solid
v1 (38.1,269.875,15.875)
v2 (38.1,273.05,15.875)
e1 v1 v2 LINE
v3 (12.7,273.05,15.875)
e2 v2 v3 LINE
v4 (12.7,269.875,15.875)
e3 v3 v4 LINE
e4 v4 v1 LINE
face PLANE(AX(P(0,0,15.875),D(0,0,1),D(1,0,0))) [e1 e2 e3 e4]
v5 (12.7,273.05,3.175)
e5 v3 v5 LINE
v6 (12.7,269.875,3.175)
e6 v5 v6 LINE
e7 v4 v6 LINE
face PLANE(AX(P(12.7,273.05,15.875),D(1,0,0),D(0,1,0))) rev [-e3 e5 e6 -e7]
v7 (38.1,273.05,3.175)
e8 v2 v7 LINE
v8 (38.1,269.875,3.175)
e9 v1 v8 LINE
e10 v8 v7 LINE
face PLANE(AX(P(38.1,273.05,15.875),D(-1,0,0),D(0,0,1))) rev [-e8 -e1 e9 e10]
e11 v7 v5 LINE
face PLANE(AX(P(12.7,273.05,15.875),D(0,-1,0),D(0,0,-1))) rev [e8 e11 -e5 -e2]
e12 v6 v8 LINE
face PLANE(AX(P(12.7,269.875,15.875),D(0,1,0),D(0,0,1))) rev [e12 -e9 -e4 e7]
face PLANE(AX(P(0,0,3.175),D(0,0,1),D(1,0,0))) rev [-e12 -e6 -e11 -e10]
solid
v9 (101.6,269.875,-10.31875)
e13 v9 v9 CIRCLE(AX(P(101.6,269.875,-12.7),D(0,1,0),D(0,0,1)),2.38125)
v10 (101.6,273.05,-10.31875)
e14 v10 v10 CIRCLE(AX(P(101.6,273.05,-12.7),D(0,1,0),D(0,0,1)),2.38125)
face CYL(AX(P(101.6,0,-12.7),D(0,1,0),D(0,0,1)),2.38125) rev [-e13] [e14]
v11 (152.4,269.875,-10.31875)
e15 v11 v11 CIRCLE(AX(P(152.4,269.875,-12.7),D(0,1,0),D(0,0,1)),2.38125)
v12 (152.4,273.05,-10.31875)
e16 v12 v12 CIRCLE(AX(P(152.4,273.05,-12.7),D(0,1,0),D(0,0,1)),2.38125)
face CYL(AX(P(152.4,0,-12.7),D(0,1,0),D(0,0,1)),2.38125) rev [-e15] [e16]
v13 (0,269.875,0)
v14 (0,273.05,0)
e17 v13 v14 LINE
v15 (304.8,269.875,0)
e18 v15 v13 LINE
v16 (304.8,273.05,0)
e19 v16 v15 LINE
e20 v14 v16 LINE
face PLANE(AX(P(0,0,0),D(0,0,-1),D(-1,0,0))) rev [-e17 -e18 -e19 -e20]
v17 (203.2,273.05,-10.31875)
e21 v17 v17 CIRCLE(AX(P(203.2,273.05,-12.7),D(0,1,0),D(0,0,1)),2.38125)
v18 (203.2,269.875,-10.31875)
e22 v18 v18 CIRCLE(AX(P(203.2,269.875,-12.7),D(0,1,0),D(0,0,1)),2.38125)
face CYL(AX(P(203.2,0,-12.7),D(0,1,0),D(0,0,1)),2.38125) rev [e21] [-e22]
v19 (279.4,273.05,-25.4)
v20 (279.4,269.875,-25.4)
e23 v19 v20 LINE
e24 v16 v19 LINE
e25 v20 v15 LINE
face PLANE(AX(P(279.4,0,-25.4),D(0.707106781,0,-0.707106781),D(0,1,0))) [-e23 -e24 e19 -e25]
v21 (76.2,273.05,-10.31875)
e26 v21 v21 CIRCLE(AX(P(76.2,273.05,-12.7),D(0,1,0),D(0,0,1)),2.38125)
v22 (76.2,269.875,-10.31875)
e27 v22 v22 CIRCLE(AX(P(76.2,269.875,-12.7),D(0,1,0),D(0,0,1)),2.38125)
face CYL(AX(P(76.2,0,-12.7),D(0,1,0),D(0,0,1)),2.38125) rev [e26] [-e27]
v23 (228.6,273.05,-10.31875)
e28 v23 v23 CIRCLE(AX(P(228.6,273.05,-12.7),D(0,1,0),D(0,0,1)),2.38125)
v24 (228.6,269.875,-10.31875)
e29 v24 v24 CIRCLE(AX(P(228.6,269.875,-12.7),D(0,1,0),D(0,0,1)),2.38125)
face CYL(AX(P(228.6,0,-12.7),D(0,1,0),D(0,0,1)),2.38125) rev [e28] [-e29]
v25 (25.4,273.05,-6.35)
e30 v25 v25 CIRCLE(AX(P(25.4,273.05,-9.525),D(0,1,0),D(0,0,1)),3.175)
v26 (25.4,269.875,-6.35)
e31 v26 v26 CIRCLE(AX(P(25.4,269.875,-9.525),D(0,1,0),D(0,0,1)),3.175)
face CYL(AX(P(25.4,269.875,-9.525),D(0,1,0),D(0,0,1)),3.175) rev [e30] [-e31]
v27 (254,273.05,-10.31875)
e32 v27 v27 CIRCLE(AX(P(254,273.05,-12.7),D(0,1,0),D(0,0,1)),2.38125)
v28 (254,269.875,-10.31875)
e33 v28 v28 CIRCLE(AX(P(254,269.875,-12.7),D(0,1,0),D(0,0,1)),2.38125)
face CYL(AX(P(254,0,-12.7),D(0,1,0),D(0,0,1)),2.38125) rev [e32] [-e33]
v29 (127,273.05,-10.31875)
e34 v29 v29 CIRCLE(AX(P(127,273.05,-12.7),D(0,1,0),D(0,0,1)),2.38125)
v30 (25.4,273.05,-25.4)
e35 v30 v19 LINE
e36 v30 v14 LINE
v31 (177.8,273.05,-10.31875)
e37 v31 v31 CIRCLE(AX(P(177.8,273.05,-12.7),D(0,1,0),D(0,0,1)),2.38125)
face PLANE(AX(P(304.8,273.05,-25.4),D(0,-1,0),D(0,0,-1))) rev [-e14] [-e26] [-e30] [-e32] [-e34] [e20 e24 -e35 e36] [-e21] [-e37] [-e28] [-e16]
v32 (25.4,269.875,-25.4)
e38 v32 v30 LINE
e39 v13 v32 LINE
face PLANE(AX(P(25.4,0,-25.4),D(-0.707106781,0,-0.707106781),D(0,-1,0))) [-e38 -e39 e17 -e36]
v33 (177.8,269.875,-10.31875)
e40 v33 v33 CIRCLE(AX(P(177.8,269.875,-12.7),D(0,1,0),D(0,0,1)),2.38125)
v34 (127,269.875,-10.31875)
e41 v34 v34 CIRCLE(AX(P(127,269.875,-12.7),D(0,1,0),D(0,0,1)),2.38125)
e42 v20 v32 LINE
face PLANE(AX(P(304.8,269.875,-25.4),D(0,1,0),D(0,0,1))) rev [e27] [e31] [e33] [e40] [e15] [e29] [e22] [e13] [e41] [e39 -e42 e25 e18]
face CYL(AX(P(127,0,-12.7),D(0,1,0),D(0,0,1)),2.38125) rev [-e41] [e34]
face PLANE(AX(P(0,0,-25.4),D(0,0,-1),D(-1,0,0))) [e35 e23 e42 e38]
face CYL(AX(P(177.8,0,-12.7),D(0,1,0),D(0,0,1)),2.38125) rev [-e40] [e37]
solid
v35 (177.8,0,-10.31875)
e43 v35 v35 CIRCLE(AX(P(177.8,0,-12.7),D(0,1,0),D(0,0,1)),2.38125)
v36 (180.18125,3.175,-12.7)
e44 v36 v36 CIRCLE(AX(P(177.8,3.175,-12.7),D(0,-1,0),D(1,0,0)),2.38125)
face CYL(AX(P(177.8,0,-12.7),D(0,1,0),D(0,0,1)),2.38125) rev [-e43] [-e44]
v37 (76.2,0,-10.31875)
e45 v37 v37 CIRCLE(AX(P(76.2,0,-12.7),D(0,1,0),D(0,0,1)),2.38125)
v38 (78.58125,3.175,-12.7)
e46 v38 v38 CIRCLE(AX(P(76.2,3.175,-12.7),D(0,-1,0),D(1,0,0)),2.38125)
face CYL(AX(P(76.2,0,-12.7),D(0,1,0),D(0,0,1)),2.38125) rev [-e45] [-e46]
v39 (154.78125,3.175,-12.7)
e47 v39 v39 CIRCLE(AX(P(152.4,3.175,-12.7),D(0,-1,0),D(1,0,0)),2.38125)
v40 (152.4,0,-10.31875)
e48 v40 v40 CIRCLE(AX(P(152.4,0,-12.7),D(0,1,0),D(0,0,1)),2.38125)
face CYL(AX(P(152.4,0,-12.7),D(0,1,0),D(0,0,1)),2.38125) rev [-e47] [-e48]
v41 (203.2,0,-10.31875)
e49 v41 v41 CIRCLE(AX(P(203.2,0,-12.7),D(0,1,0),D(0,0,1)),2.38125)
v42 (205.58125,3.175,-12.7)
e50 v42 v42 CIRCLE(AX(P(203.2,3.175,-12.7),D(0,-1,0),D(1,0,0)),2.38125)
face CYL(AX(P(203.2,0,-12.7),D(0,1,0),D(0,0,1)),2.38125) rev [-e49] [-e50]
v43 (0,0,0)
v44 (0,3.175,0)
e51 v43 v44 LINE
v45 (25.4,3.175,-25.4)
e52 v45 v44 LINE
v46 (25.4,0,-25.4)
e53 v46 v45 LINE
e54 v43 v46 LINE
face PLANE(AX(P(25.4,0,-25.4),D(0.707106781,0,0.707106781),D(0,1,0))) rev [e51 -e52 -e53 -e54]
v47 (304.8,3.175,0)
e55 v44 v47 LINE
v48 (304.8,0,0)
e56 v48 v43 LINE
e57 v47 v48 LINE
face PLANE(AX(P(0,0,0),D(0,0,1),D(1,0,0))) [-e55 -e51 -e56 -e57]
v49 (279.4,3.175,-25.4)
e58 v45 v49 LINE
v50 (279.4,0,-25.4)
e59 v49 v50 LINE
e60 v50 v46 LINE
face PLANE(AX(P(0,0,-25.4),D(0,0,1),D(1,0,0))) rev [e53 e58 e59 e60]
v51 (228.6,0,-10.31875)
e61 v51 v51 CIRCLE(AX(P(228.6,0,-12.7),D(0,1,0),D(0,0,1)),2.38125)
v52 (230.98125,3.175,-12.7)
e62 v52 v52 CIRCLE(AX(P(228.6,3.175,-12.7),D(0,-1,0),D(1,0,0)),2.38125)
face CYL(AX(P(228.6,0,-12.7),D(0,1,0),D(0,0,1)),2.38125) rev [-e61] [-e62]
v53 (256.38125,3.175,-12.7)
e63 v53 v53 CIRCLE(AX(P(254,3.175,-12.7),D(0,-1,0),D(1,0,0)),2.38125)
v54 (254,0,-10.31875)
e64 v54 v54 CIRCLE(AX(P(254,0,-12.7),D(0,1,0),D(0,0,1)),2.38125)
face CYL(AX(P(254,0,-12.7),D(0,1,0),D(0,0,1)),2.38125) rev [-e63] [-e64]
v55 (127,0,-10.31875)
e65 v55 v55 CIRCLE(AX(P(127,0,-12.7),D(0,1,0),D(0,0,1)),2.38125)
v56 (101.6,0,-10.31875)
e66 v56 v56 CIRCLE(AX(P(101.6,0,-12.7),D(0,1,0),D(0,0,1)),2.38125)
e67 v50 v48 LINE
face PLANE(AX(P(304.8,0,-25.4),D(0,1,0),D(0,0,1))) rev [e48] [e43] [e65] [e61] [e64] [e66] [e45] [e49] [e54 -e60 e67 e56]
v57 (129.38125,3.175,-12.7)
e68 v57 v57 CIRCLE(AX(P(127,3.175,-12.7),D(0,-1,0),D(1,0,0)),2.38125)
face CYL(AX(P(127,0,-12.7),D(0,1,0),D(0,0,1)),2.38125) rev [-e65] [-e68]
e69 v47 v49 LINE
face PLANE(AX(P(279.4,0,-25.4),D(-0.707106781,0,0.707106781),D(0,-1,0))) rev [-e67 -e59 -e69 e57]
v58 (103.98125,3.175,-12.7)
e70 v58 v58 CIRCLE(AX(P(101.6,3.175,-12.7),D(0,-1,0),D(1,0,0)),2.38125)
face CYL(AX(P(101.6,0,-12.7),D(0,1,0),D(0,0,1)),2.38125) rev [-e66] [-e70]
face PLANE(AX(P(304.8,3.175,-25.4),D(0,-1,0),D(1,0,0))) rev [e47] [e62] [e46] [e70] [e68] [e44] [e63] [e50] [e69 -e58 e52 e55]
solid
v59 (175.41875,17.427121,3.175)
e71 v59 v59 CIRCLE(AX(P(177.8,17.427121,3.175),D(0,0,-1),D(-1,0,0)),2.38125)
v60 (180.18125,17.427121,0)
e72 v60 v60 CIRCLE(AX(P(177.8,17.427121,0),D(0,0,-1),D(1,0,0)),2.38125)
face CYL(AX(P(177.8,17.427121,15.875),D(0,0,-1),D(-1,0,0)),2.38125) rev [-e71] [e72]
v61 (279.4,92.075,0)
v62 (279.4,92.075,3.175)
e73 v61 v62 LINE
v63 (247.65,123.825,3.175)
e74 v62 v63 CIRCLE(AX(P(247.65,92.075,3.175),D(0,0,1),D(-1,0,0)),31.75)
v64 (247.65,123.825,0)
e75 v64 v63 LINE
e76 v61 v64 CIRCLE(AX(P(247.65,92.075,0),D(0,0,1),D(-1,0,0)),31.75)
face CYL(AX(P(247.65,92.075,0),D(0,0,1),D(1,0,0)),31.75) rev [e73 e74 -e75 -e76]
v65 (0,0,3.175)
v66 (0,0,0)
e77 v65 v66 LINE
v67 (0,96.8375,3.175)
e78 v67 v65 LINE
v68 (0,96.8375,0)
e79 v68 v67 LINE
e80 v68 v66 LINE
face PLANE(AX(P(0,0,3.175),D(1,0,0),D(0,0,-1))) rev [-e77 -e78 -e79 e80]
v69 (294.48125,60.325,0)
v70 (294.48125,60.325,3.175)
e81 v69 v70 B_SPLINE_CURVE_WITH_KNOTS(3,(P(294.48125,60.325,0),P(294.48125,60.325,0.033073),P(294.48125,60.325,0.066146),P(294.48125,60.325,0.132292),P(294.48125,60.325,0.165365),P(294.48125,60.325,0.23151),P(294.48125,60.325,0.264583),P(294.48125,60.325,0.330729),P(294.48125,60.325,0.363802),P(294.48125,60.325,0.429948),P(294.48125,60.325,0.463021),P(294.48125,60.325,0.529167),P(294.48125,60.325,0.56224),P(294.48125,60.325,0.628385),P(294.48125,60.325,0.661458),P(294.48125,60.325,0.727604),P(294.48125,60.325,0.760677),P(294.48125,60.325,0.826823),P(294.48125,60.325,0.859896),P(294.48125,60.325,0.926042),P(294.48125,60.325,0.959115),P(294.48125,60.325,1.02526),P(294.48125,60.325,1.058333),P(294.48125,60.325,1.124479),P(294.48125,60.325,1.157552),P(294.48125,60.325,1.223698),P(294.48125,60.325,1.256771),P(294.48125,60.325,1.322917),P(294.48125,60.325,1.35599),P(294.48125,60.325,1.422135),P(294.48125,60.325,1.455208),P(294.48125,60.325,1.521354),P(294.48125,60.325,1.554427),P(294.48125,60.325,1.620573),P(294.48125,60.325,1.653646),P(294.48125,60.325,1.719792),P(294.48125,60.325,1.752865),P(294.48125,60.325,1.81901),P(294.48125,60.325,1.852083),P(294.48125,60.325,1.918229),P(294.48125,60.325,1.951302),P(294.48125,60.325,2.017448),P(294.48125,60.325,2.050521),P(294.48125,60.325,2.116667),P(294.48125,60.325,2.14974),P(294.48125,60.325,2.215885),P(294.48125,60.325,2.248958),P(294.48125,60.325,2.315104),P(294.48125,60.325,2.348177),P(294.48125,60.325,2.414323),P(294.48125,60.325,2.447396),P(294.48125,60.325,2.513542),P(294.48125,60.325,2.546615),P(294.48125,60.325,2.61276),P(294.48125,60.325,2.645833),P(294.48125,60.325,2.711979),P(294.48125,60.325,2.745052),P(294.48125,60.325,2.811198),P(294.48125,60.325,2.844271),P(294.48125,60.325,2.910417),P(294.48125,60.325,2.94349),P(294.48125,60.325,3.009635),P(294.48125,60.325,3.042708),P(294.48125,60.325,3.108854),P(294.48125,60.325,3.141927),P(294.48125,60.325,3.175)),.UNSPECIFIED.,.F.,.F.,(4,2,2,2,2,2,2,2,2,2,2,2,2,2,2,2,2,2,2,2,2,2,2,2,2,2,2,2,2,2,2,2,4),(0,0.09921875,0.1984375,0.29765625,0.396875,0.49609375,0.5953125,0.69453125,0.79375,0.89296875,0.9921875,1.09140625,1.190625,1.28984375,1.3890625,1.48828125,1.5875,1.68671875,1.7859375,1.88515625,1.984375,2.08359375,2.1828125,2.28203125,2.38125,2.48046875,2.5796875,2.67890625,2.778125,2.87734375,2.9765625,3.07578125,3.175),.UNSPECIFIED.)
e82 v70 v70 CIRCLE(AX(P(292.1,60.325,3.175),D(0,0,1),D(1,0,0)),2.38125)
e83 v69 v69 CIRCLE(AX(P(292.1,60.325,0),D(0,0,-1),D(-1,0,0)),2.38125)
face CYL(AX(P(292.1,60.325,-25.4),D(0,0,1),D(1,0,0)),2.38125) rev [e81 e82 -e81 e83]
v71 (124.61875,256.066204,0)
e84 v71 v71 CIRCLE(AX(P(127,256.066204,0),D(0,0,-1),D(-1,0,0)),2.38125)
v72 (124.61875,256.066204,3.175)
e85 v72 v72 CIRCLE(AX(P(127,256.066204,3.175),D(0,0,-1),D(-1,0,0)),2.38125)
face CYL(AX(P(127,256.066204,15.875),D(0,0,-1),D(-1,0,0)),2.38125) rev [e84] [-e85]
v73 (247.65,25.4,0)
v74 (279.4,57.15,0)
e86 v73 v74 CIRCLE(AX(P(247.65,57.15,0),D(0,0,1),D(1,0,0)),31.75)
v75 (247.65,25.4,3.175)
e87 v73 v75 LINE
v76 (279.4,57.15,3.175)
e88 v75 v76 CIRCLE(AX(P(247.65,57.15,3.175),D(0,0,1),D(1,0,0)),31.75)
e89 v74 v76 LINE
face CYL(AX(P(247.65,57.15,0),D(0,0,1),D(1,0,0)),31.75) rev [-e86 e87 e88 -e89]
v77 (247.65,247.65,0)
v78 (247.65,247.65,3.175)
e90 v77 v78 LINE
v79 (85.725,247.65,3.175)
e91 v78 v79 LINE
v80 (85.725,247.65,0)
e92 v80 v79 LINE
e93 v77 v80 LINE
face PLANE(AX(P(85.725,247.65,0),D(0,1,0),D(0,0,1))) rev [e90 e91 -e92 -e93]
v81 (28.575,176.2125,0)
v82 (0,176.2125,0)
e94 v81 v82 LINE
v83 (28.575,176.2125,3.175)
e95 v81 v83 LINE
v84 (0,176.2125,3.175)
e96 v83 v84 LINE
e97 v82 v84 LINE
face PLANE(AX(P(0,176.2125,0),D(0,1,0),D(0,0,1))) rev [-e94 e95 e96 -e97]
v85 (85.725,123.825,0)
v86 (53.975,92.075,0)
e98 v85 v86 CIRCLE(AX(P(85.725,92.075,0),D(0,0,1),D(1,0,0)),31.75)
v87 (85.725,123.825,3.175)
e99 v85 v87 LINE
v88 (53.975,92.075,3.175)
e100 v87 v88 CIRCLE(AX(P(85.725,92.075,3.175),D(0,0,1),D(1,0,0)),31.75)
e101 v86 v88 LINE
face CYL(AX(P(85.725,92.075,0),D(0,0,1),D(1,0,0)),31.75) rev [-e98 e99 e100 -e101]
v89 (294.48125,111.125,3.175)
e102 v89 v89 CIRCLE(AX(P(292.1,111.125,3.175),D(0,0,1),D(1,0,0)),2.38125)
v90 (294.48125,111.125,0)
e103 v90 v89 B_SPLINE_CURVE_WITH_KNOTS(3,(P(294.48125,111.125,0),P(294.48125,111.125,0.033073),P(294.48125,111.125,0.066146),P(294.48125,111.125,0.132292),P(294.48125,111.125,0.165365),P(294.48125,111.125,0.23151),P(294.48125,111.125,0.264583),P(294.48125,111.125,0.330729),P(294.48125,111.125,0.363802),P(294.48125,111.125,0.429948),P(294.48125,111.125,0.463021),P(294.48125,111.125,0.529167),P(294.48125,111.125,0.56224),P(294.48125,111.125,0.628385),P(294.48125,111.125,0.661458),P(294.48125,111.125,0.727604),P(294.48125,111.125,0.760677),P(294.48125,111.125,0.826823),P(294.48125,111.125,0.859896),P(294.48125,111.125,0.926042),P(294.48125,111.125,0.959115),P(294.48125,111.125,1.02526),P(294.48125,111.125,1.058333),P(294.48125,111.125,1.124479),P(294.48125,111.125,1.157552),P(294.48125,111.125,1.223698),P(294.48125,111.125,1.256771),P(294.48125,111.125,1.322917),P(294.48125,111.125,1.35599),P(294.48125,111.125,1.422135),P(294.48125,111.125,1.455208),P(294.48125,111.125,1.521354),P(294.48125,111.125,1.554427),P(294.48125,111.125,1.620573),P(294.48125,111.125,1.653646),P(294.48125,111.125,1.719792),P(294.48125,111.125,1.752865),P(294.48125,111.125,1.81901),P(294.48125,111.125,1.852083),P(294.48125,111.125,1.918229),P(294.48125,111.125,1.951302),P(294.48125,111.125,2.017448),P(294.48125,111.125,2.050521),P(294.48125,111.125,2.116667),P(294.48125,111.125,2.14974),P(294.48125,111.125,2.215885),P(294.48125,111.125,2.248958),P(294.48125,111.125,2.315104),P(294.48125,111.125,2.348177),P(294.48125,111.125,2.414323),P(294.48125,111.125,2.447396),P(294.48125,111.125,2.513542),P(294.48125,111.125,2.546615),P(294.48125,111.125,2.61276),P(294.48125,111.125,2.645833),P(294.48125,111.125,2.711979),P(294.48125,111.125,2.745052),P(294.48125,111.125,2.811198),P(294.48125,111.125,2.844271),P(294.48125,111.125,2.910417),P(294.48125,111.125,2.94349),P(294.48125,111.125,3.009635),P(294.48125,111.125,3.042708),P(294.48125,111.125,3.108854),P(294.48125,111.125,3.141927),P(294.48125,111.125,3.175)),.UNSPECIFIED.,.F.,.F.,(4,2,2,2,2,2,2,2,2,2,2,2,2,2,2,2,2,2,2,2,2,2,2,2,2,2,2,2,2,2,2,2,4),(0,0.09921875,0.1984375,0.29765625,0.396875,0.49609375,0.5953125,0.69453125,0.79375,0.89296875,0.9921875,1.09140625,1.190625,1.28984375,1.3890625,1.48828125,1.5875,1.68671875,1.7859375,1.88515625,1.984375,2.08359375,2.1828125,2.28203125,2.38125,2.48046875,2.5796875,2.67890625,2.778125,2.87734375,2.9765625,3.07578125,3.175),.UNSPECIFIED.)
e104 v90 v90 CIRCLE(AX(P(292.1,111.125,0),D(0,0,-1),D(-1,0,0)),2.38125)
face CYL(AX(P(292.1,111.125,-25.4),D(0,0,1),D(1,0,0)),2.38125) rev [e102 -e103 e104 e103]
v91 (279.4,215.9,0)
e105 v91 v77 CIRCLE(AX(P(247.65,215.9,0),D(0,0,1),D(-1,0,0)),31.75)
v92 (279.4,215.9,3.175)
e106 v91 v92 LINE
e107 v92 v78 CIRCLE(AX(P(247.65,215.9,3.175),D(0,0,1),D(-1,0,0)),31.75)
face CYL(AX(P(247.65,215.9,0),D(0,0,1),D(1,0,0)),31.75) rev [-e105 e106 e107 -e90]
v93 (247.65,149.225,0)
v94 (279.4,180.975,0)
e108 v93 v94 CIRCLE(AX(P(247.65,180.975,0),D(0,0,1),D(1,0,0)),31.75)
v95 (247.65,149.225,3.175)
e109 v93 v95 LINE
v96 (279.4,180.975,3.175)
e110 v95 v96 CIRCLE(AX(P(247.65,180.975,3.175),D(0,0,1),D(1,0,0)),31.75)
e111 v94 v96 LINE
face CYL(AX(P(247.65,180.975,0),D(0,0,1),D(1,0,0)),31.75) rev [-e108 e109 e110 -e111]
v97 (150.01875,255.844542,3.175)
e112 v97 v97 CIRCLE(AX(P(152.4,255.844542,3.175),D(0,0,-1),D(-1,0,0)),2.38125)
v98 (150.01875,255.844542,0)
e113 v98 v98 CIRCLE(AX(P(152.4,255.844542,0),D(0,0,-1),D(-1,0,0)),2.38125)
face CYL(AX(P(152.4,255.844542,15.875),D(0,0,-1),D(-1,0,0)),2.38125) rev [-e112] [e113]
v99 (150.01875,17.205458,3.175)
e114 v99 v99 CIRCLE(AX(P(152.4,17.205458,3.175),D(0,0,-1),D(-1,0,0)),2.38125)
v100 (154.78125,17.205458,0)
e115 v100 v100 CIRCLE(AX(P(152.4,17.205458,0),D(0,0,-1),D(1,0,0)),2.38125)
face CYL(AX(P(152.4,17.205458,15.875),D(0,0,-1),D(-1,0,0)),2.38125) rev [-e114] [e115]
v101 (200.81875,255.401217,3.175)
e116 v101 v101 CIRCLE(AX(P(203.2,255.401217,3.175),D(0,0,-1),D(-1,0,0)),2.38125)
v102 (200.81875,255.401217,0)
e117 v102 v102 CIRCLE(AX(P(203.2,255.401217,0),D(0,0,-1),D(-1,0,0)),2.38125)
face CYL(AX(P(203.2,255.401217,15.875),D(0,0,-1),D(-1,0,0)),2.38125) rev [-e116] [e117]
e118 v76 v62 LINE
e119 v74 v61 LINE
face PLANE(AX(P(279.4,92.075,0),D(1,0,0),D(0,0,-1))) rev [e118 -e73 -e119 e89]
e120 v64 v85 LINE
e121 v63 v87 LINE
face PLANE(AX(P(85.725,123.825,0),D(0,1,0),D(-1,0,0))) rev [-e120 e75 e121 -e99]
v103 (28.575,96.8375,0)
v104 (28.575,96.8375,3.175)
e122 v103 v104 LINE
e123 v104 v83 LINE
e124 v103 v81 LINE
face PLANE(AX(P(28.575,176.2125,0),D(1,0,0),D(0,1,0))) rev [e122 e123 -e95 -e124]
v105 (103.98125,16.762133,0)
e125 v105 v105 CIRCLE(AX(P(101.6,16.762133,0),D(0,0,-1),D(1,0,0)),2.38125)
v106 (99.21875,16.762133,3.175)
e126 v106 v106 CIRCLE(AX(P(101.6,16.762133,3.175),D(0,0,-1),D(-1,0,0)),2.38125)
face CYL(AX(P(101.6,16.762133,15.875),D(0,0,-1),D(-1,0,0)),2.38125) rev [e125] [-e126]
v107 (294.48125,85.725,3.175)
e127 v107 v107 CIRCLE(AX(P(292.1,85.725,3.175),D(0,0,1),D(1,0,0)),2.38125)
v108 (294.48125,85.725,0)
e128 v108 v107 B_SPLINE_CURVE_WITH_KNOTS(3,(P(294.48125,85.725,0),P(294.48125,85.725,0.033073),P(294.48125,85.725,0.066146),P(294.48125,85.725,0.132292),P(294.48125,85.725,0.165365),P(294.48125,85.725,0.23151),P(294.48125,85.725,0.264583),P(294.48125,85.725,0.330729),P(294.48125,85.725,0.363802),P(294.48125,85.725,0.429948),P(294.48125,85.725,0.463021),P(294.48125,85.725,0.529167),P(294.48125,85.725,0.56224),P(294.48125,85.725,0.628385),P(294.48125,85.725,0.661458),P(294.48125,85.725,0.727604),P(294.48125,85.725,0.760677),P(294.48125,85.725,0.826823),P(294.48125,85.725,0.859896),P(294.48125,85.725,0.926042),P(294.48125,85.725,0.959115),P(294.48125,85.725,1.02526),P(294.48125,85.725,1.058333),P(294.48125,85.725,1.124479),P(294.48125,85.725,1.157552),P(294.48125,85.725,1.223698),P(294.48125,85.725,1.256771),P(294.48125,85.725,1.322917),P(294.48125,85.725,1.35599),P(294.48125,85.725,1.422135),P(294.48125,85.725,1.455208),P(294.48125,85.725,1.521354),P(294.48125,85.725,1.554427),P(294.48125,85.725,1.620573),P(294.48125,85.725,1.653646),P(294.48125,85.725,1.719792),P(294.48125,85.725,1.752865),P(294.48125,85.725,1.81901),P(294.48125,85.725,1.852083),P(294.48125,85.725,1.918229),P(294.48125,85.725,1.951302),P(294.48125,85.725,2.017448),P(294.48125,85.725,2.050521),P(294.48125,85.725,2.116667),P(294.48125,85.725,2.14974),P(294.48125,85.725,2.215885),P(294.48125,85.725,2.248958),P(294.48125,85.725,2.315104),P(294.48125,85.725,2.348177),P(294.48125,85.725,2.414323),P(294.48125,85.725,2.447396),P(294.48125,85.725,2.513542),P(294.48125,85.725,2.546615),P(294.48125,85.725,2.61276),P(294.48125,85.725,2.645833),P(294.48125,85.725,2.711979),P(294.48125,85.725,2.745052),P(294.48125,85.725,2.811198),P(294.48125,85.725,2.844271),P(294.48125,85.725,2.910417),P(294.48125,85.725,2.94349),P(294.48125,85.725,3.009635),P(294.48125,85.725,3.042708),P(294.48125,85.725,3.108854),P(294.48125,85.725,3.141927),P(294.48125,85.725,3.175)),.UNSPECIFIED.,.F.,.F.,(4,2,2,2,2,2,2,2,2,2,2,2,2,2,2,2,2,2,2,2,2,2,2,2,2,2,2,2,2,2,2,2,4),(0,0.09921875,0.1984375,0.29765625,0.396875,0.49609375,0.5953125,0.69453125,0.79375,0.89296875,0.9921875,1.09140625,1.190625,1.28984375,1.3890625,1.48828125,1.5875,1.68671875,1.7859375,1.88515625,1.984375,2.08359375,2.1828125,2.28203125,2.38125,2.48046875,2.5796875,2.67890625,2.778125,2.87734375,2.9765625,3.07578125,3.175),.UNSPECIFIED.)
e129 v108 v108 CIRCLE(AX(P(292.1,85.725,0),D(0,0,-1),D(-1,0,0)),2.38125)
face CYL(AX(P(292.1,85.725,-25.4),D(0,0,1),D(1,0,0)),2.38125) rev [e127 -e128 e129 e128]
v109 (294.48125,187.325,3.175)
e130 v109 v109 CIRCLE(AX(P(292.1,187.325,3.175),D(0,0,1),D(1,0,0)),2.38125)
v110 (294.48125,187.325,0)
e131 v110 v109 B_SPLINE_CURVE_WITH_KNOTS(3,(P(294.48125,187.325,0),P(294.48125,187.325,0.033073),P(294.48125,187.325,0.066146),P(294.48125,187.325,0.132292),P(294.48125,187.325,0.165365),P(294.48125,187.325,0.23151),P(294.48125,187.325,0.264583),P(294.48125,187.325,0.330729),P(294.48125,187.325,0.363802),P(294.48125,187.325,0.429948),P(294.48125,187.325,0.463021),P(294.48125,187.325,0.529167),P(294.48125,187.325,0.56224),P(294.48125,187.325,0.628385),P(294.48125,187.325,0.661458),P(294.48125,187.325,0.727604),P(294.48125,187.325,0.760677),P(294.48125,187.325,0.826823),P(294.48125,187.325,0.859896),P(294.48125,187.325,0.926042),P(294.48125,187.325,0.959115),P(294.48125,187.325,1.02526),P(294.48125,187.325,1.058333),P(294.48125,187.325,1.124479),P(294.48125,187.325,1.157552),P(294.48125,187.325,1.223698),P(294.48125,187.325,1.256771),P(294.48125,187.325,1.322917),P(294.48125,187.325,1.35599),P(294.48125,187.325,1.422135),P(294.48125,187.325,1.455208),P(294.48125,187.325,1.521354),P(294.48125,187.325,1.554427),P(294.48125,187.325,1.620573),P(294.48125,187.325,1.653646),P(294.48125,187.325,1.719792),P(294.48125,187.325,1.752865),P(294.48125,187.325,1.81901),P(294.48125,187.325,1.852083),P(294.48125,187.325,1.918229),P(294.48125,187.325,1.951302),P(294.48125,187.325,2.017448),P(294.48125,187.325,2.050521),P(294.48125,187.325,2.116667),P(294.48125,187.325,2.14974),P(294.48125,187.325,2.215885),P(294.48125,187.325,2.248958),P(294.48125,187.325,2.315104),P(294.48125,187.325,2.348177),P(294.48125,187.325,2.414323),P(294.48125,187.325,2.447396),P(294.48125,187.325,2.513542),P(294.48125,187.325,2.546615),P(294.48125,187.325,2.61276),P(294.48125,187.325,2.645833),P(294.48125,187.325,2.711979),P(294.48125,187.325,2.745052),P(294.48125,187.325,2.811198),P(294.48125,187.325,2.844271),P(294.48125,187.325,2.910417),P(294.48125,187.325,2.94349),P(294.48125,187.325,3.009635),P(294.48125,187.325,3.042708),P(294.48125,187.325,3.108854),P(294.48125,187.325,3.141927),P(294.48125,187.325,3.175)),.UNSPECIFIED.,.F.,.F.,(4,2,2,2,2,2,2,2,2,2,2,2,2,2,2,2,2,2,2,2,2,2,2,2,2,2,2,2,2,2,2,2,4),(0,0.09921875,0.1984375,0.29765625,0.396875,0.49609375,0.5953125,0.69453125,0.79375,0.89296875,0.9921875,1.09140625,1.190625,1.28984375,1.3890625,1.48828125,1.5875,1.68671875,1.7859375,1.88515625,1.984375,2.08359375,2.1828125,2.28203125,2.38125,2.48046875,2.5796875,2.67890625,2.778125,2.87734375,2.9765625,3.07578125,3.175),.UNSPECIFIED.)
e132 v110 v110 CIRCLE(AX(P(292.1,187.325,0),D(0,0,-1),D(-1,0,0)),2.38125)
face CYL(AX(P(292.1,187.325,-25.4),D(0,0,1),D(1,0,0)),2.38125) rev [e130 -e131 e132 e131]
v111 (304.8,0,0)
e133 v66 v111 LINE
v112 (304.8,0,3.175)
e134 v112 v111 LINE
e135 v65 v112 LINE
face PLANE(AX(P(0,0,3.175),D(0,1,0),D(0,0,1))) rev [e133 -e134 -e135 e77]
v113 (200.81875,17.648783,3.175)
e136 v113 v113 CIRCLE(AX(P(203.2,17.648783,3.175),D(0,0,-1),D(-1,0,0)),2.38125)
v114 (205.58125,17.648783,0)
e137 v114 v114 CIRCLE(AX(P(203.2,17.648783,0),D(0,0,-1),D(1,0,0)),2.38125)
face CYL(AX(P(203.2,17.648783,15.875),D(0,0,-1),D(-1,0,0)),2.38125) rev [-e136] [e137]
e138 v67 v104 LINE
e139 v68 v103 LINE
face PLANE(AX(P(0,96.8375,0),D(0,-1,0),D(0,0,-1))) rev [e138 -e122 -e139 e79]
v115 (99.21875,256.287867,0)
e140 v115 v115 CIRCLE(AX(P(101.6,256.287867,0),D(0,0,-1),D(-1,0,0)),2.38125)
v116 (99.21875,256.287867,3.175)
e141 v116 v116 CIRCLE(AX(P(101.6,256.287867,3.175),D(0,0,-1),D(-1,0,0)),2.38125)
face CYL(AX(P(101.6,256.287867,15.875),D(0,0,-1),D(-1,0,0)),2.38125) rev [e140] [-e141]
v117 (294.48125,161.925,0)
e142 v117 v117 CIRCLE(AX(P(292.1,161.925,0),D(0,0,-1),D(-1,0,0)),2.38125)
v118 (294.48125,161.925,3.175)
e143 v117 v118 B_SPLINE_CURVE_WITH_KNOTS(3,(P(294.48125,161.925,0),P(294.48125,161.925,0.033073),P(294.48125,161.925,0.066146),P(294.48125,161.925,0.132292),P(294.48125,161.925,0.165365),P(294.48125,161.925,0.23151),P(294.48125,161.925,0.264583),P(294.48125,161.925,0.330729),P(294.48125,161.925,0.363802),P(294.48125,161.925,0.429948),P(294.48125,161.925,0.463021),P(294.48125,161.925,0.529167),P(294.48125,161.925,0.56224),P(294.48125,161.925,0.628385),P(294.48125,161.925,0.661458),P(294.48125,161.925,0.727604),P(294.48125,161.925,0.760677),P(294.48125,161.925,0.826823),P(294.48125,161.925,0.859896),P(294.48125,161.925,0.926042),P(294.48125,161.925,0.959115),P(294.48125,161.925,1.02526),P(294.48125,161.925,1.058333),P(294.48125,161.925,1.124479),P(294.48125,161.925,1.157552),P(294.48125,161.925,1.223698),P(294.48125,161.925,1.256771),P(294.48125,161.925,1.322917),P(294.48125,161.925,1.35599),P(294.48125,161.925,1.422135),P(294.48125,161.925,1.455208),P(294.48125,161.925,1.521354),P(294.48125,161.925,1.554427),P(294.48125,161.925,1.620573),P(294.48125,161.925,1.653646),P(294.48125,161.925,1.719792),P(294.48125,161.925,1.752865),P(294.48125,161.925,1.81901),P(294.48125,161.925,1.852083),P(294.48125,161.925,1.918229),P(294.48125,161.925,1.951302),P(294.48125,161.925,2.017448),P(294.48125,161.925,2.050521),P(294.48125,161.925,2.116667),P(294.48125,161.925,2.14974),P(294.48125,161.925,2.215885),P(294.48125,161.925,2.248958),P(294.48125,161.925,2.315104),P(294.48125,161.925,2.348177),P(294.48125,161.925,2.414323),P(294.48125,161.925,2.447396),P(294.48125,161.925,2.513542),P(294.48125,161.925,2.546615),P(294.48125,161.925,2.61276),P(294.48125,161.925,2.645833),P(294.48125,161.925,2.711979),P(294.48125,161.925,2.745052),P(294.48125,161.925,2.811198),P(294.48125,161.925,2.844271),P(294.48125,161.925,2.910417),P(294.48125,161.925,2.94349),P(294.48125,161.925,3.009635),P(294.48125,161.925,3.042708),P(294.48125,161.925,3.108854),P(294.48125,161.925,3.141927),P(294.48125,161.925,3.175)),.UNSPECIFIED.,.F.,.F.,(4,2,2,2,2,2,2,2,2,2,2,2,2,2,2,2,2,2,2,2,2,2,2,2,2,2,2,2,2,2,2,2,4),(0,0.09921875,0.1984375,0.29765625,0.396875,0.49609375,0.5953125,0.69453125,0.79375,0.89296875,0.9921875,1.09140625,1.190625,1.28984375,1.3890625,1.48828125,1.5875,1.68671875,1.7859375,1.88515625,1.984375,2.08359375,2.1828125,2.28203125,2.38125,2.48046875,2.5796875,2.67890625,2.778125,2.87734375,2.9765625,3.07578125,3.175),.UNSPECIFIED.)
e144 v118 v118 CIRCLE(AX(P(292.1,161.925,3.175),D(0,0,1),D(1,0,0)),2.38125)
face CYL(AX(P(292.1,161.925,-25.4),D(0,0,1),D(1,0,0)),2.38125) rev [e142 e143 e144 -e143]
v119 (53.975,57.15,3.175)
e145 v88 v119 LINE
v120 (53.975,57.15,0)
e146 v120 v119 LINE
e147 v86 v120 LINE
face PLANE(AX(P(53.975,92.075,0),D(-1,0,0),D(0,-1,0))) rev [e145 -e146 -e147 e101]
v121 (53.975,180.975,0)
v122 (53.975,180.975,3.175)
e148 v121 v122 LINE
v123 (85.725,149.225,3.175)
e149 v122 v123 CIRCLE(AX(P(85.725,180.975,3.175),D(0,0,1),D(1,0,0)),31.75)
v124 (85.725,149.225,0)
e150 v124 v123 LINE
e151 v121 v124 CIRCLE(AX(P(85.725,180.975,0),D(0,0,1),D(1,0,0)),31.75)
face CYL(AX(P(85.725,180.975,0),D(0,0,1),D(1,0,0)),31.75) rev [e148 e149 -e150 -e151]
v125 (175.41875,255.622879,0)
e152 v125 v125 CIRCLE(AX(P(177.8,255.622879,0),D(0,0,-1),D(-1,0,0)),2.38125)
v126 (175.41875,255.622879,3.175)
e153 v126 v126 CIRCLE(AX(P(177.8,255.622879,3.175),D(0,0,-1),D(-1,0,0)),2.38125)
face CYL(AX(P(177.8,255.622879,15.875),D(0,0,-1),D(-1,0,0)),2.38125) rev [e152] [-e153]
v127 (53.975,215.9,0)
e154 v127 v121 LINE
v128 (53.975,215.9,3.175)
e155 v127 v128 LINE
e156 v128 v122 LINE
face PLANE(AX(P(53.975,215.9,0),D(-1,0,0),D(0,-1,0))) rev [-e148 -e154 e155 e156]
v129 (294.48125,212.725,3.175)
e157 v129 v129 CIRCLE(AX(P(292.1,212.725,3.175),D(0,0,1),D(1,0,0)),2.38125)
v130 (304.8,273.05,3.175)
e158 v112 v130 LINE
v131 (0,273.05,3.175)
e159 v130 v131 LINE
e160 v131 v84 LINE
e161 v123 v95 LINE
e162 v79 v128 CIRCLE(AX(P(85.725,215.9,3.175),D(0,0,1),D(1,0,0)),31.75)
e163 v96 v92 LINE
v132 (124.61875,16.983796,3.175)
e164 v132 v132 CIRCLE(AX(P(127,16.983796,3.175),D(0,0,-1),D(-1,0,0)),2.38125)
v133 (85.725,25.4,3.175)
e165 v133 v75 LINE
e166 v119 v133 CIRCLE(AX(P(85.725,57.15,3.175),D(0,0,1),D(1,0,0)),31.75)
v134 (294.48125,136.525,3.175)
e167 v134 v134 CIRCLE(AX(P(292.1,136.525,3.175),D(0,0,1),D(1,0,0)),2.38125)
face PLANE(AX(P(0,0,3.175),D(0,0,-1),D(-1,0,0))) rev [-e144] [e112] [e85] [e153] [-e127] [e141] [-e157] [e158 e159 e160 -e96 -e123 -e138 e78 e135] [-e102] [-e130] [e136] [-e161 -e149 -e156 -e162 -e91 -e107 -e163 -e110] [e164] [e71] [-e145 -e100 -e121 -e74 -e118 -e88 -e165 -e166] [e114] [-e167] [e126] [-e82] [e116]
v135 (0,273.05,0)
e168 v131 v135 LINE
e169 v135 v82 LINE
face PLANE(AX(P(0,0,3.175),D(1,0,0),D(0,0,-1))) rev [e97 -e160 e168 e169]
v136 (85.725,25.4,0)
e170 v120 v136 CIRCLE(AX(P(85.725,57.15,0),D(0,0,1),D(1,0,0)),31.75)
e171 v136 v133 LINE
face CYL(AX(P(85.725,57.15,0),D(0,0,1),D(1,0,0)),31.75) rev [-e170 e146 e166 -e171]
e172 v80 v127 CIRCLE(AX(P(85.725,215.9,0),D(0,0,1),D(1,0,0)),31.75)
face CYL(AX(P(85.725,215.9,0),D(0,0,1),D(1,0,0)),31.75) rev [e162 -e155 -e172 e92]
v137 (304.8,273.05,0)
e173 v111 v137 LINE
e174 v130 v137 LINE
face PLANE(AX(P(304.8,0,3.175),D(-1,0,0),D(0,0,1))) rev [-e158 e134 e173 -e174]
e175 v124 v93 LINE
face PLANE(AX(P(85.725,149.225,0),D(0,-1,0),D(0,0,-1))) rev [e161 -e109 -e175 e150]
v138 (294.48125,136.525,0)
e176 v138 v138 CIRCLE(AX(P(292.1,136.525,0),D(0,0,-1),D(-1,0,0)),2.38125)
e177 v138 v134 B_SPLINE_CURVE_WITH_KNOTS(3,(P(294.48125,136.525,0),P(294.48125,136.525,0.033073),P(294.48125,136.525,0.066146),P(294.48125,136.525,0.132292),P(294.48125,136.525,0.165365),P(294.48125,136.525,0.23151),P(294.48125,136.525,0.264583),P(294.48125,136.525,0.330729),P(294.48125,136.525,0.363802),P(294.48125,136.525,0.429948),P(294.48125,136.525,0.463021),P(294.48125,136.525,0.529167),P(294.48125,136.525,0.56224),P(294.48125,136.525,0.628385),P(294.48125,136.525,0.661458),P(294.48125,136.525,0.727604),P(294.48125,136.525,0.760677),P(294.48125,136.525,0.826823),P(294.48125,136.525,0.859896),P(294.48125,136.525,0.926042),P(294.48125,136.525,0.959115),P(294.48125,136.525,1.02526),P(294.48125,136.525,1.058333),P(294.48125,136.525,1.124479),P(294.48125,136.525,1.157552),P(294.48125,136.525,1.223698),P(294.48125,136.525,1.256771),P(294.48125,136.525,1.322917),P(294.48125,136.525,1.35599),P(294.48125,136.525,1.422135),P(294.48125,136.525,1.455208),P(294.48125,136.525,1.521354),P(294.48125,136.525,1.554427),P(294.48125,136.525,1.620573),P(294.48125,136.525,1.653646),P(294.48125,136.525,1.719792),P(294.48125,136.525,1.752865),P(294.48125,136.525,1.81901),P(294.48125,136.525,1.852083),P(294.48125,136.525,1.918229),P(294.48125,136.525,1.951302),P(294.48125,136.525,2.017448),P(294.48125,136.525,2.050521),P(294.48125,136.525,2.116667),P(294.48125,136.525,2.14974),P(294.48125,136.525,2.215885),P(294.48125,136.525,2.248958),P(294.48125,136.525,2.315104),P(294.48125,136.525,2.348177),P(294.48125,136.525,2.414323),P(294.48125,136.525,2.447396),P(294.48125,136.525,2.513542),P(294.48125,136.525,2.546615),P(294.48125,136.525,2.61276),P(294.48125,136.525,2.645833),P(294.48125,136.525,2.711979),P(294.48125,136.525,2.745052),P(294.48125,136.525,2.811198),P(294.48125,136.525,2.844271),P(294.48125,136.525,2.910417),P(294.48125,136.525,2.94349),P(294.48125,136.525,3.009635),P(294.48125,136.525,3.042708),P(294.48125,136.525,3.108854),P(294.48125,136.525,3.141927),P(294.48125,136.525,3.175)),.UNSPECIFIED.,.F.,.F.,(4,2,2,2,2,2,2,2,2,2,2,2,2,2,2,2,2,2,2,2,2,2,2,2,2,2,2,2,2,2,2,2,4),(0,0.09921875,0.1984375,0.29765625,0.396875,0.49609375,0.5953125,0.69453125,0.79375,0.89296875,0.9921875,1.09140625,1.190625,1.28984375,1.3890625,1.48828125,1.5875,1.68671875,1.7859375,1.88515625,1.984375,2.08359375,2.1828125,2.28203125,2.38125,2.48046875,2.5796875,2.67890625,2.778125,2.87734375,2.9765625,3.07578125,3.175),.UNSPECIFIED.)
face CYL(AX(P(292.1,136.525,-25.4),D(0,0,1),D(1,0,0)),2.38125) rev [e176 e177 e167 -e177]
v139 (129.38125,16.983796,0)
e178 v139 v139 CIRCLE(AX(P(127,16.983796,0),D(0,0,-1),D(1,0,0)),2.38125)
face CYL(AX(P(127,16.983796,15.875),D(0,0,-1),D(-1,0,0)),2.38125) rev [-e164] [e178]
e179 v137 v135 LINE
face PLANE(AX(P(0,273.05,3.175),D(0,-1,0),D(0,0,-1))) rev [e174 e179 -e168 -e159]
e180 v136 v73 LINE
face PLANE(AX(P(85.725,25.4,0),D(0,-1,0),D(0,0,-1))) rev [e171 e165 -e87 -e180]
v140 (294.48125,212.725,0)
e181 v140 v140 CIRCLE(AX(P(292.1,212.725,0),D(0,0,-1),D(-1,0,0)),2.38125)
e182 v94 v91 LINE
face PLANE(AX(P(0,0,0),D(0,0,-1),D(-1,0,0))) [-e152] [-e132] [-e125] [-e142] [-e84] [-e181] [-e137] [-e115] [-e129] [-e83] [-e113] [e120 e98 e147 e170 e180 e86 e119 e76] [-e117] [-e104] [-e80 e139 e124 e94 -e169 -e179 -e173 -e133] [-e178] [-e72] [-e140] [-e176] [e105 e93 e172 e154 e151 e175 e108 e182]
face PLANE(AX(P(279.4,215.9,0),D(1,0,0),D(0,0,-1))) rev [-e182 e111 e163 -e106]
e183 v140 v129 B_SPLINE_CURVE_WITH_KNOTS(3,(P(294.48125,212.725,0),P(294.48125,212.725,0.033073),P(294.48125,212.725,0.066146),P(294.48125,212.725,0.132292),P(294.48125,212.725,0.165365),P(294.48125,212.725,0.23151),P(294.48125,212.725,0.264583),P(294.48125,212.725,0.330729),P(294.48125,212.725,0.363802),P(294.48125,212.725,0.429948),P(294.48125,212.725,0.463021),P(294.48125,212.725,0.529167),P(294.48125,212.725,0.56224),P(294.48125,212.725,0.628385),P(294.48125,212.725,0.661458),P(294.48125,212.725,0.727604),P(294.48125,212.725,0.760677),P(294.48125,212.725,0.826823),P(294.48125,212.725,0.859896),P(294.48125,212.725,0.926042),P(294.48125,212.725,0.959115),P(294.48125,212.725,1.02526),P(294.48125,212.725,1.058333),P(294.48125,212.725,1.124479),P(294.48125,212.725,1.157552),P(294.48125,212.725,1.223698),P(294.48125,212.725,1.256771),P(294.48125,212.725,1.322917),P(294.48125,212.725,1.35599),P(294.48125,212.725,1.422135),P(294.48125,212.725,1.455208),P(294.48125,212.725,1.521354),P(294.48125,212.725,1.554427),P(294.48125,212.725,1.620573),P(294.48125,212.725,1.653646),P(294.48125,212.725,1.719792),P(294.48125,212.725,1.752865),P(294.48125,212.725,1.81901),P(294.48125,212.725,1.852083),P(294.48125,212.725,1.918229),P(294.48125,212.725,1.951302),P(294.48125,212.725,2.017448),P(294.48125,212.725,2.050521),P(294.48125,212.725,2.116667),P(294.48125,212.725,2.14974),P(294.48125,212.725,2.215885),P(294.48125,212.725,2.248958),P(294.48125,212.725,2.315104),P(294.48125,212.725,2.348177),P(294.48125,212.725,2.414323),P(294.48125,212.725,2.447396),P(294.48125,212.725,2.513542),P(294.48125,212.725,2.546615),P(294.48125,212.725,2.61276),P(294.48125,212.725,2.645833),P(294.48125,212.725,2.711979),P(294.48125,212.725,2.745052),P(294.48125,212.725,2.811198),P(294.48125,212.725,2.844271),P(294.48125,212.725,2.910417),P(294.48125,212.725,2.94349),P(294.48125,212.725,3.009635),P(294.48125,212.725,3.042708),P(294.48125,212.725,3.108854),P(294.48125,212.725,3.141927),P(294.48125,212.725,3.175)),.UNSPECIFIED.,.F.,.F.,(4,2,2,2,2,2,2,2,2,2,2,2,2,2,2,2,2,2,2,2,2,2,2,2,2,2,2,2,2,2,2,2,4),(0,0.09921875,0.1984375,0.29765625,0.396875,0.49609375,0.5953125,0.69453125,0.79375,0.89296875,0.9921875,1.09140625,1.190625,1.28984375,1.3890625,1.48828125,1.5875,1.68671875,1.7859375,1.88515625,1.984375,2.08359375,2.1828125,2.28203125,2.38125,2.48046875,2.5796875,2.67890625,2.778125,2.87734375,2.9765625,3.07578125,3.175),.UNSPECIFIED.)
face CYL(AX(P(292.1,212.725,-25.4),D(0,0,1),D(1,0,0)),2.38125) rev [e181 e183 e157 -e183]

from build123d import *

# Parameters (mm, degrees)
SKETCH1_W           = 304.8
SKETCH1_H           = 273.05
BOSS_EXTRUDE1_DEPTH = 3.175
SKETCH2_W           = 28.575
SKETCH2_H           = 79.375
CUT_EXTRUDE1_DEPTH  = 3.175
SKETCH4_W           = 304.8
SKETCH4_H           = 3.175
BASE_FLANGE1_DEPTH  = 25.4
SKETCH9_W           = 304.8
SKETCH9_H           = 3.175
BASE_FLANGE2_DEPTH  = 25.4
SKETCH12_W          = 25.4
SKETCH12_H          = 3.175
BASE_FLANGE3_DEPTH  = 12.7
CHAMFER1_SIZE       = 25.4
CHAMFER2_SIZE       = 25.4
SKETCH15_R          = 3.175
CUT_EXTRUDE3_DEPTH  = 3.175
SKETCH17_R          = 2.38125
CUT_EXTRUDE5_DEPTH  = 411.005490817
SKETCH18_R          = 2.38125
CUT_EXTRUDE6_DEPTH  = 411.214423351
SKETCH19_R          = 2.38125
CUT_EXTRUDE8_DEPTH  = 411.005490817


# Sheet-metal steps are written as plain solids
with BuildPart() as part:
    # Sketch1 → Boss-Extrude1 (new body)
    with BuildSketch(Plane.XY):
        with Locations((152.4, 136.525)):
            Rectangle(SKETCH1_W, SKETCH1_H)
    extrude(amount=BOSS_EXTRUDE1_DEPTH)

    # Sketch2 → Cut-Extrude1 (cut)
    with BuildSketch(Plane.XY.offset(3.175)):
        with Locations((14.2875, 136.525)):
            Rectangle(SKETCH2_W, SKETCH2_H)
        with BuildLine():
            Line((85.725, 247.65), (247.65, 247.65))
            ThreePointArc((247.65, 247.65), (270.100640303, 238.350640303), (279.4, 215.9))
            Line((279.4, 215.9), (279.4, 180.975))
            ThreePointArc((279.4, 180.975), (270.100640303, 158.524359697), (247.65, 149.225))
            Line((247.65, 149.225), (85.725, 149.225))
            ThreePointArc((85.725, 149.225), (63.274359697, 158.524359697), (53.975, 180.975))
            Line((53.975, 180.975), (53.975, 215.9))
            ThreePointArc((53.975, 215.9), (63.274359697, 238.350640303), (85.725, 247.65))
        make_face()
        with BuildLine():
            Line((85.725, 123.825), (247.65, 123.825))
            ThreePointArc((247.65, 123.825), (270.100640303, 114.525640303), (279.4, 92.075))
            Line((279.4, 92.075), (279.4, 57.15))
            ThreePointArc((279.4, 57.15), (270.100640303, 34.699359697), (247.65, 25.4))
            Line((247.65, 25.4), (85.725, 25.4))
            ThreePointArc((85.725, 25.4), (63.274359697, 34.699359697), (53.975, 57.15))
            Line((53.975, 57.15), (53.975, 92.075))
            ThreePointArc((53.975, 92.075), (63.274359697, 114.525640303), (85.725, 123.825))
        make_face()
    extrude(amount=-CUT_EXTRUDE1_DEPTH, mode=Mode.SUBTRACT)

    # Sketch18 → Cut-Extrude6 (cut, through all)
    with BuildSketch(Plane.XY.offset(3.175)):
        with Locations((292.1, 136.525)):
            Circle(SKETCH18_R)
        with Locations((292.1, 161.925)):
            Circle(SKETCH18_R)
        with Locations((292.1, 111.125)):
            Circle(SKETCH18_R)
        with Locations((292.1, 85.725)):
            Circle(SKETCH18_R)
        with Locations((292.1, 60.325)):
            Circle(SKETCH18_R)
        with Locations((292.1, 187.325)):
            Circle(SKETCH18_R)
        with Locations((292.1, 212.725)):
            Circle(SKETCH18_R)
    extrude(amount=-CUT_EXTRUDE6_DEPTH, mode=Mode.SUBTRACT)

    # Sketch19 → Cut-Extrude8 (cut, through all)
    with BuildSketch(Plane(origin=(0, 0, 0), x_dir=(-1, 0, 0), z_dir=(0, 0, -1))):
        with Locations((-152.4, 255.844541753)):
            Circle(SKETCH19_R)
        with Locations((-127, 256.066204195)):
            Circle(SKETCH19_R)
        with Locations((-101.6, 256.287866637)):
            Circle(SKETCH19_R)
        with Locations((-177.8, 255.622879311)):
            Circle(SKETCH19_R)
        with Locations((-203.2, 255.401216869)):
            Circle(SKETCH19_R)
        with Locations((-101.6, 16.762133363)):
            Circle(SKETCH19_R)
        with Locations((-127, 16.983795805)):
            Circle(SKETCH19_R)
        with Locations((-152.4, 17.205458247)):
            Circle(SKETCH19_R)
        with Locations((-177.8, 17.427120689)):
            Circle(SKETCH19_R)
        with Locations((-203.2, 17.648783131)):
            Circle(SKETCH19_R)
    extrude(amount=-CUT_EXTRUDE8_DEPTH, mode=Mode.SUBTRACT)


with BuildPart() as body_2:
    # Sketch4 → Base-Flange1 (new body)
    with BuildSketch(Plane(origin=(0, 0, 0), x_dir=(-1, 0, 0), z_dir=(0, 0, -1))):
        with Locations((-152.4, 271.4625)):
            Rectangle(SKETCH4_W, SKETCH4_H)
    extrude(amount=BASE_FLANGE1_DEPTH)

    # Chamfer1
    chamfer1_edges = [body_2.edges().sort_by_distance(p)[0] for p in [
        (304.8, 271.4625, -25.4),
        (0, 271.4625, -25.4),
    ]]
    chamfer(chamfer1_edges, length=CHAMFER1_SIZE - 0.0001)  # a hair under: the kernel refuses the full size

    # Sketch15 → Cut-Extrude3 (cut)
    with BuildSketch(Plane(origin=(0, 273.05, 0), x_dir=(1, 0, 0), z_dir=(0, 1, 0))):
        with Locations(Location((25.4, 9.525, 0), (0, 0, 270))):
            Circle(SKETCH15_R)
    extrude(amount=-CUT_EXTRUDE3_DEPTH, mode=Mode.SUBTRACT)


with BuildPart() as body_3:
    # Sketch9 → Base-Flange2 (new body)
    with BuildSketch(Plane(origin=(0, 0, 0), x_dir=(-1, 0, 0), z_dir=(0, 0, -1))):
        with Locations((-152.4, 1.5875)):
            Rectangle(SKETCH9_W, SKETCH9_H)
    extrude(amount=BASE_FLANGE2_DEPTH)

    # Chamfer2
    chamfer2_edges = [body_3.edges().sort_by_distance(p)[0] for p in [
        (0, 1.5875, -25.4),
        (304.8, 1.5875, -25.4),
    ]]
    chamfer(chamfer2_edges, length=CHAMFER2_SIZE - 0.0001)  # a hair under: the kernel refuses the full size


with BuildPart() as body_4:
    # Sketch12 → Base-Flange3 (new body)
    with BuildSketch(Plane.XY.offset(3.175)):
        with Locations((25.4, 271.4625)):
            Rectangle(SKETCH12_W, SKETCH12_H)
    extrude(amount=BASE_FLANGE3_DEPTH)


with BuildPart() as cut_extrude5_tool:
    # Sketch17 → Cut-Extrude5 (new, through all)
    with BuildSketch(Plane(origin=(0, 273.05, 0), x_dir=(1, 0, 0), z_dir=(0, 1, 0))):
        with Locations(Location((76.2, 12.7, 0), (0, 0, 270))):
            Circle(SKETCH17_R)
        with Locations(Location((101.6, 12.7, 0), (0, 0, 270))):
            Circle(SKETCH17_R)
        with Locations(Location((127, 12.7, 0), (0, 0, 270))):
            Circle(SKETCH17_R)
        with Locations(Location((152.4, 12.7, 0), (0, 0, 270))):
            Circle(SKETCH17_R)
        with Locations(Location((177.8, 12.7, 0), (0, 0, 270))):
            Circle(SKETCH17_R)
        with Locations(Location((203.2, 12.7, 0), (0, 0, 270))):
            Circle(SKETCH17_R)
        with Locations(Location((228.6, 12.7, 0), (0, 0, 270))):
            Circle(SKETCH17_R)
        with Locations(Location((254, 12.7, 0), (0, 0, 270))):
            Circle(SKETCH17_R)
    extrude(amount=-CUT_EXTRUDE5_DEPTH)


with BuildPart() as body_2_1:
    add(body_2.part)

    # Cut-Extrude5: cut by cut_extrude5_tool
    add(cut_extrude5_tool.part, mode=Mode.SUBTRACT)


with BuildPart() as body_3_1:
    add(body_3.part)

    # Cut-Extrude5: cut by cut_extrude5_tool
    add(cut_extrude5_tool.part, mode=Mode.SUBTRACT)


solid = Compound([part.part, body_4.part, body_2_1.part, body_3_1.part])
